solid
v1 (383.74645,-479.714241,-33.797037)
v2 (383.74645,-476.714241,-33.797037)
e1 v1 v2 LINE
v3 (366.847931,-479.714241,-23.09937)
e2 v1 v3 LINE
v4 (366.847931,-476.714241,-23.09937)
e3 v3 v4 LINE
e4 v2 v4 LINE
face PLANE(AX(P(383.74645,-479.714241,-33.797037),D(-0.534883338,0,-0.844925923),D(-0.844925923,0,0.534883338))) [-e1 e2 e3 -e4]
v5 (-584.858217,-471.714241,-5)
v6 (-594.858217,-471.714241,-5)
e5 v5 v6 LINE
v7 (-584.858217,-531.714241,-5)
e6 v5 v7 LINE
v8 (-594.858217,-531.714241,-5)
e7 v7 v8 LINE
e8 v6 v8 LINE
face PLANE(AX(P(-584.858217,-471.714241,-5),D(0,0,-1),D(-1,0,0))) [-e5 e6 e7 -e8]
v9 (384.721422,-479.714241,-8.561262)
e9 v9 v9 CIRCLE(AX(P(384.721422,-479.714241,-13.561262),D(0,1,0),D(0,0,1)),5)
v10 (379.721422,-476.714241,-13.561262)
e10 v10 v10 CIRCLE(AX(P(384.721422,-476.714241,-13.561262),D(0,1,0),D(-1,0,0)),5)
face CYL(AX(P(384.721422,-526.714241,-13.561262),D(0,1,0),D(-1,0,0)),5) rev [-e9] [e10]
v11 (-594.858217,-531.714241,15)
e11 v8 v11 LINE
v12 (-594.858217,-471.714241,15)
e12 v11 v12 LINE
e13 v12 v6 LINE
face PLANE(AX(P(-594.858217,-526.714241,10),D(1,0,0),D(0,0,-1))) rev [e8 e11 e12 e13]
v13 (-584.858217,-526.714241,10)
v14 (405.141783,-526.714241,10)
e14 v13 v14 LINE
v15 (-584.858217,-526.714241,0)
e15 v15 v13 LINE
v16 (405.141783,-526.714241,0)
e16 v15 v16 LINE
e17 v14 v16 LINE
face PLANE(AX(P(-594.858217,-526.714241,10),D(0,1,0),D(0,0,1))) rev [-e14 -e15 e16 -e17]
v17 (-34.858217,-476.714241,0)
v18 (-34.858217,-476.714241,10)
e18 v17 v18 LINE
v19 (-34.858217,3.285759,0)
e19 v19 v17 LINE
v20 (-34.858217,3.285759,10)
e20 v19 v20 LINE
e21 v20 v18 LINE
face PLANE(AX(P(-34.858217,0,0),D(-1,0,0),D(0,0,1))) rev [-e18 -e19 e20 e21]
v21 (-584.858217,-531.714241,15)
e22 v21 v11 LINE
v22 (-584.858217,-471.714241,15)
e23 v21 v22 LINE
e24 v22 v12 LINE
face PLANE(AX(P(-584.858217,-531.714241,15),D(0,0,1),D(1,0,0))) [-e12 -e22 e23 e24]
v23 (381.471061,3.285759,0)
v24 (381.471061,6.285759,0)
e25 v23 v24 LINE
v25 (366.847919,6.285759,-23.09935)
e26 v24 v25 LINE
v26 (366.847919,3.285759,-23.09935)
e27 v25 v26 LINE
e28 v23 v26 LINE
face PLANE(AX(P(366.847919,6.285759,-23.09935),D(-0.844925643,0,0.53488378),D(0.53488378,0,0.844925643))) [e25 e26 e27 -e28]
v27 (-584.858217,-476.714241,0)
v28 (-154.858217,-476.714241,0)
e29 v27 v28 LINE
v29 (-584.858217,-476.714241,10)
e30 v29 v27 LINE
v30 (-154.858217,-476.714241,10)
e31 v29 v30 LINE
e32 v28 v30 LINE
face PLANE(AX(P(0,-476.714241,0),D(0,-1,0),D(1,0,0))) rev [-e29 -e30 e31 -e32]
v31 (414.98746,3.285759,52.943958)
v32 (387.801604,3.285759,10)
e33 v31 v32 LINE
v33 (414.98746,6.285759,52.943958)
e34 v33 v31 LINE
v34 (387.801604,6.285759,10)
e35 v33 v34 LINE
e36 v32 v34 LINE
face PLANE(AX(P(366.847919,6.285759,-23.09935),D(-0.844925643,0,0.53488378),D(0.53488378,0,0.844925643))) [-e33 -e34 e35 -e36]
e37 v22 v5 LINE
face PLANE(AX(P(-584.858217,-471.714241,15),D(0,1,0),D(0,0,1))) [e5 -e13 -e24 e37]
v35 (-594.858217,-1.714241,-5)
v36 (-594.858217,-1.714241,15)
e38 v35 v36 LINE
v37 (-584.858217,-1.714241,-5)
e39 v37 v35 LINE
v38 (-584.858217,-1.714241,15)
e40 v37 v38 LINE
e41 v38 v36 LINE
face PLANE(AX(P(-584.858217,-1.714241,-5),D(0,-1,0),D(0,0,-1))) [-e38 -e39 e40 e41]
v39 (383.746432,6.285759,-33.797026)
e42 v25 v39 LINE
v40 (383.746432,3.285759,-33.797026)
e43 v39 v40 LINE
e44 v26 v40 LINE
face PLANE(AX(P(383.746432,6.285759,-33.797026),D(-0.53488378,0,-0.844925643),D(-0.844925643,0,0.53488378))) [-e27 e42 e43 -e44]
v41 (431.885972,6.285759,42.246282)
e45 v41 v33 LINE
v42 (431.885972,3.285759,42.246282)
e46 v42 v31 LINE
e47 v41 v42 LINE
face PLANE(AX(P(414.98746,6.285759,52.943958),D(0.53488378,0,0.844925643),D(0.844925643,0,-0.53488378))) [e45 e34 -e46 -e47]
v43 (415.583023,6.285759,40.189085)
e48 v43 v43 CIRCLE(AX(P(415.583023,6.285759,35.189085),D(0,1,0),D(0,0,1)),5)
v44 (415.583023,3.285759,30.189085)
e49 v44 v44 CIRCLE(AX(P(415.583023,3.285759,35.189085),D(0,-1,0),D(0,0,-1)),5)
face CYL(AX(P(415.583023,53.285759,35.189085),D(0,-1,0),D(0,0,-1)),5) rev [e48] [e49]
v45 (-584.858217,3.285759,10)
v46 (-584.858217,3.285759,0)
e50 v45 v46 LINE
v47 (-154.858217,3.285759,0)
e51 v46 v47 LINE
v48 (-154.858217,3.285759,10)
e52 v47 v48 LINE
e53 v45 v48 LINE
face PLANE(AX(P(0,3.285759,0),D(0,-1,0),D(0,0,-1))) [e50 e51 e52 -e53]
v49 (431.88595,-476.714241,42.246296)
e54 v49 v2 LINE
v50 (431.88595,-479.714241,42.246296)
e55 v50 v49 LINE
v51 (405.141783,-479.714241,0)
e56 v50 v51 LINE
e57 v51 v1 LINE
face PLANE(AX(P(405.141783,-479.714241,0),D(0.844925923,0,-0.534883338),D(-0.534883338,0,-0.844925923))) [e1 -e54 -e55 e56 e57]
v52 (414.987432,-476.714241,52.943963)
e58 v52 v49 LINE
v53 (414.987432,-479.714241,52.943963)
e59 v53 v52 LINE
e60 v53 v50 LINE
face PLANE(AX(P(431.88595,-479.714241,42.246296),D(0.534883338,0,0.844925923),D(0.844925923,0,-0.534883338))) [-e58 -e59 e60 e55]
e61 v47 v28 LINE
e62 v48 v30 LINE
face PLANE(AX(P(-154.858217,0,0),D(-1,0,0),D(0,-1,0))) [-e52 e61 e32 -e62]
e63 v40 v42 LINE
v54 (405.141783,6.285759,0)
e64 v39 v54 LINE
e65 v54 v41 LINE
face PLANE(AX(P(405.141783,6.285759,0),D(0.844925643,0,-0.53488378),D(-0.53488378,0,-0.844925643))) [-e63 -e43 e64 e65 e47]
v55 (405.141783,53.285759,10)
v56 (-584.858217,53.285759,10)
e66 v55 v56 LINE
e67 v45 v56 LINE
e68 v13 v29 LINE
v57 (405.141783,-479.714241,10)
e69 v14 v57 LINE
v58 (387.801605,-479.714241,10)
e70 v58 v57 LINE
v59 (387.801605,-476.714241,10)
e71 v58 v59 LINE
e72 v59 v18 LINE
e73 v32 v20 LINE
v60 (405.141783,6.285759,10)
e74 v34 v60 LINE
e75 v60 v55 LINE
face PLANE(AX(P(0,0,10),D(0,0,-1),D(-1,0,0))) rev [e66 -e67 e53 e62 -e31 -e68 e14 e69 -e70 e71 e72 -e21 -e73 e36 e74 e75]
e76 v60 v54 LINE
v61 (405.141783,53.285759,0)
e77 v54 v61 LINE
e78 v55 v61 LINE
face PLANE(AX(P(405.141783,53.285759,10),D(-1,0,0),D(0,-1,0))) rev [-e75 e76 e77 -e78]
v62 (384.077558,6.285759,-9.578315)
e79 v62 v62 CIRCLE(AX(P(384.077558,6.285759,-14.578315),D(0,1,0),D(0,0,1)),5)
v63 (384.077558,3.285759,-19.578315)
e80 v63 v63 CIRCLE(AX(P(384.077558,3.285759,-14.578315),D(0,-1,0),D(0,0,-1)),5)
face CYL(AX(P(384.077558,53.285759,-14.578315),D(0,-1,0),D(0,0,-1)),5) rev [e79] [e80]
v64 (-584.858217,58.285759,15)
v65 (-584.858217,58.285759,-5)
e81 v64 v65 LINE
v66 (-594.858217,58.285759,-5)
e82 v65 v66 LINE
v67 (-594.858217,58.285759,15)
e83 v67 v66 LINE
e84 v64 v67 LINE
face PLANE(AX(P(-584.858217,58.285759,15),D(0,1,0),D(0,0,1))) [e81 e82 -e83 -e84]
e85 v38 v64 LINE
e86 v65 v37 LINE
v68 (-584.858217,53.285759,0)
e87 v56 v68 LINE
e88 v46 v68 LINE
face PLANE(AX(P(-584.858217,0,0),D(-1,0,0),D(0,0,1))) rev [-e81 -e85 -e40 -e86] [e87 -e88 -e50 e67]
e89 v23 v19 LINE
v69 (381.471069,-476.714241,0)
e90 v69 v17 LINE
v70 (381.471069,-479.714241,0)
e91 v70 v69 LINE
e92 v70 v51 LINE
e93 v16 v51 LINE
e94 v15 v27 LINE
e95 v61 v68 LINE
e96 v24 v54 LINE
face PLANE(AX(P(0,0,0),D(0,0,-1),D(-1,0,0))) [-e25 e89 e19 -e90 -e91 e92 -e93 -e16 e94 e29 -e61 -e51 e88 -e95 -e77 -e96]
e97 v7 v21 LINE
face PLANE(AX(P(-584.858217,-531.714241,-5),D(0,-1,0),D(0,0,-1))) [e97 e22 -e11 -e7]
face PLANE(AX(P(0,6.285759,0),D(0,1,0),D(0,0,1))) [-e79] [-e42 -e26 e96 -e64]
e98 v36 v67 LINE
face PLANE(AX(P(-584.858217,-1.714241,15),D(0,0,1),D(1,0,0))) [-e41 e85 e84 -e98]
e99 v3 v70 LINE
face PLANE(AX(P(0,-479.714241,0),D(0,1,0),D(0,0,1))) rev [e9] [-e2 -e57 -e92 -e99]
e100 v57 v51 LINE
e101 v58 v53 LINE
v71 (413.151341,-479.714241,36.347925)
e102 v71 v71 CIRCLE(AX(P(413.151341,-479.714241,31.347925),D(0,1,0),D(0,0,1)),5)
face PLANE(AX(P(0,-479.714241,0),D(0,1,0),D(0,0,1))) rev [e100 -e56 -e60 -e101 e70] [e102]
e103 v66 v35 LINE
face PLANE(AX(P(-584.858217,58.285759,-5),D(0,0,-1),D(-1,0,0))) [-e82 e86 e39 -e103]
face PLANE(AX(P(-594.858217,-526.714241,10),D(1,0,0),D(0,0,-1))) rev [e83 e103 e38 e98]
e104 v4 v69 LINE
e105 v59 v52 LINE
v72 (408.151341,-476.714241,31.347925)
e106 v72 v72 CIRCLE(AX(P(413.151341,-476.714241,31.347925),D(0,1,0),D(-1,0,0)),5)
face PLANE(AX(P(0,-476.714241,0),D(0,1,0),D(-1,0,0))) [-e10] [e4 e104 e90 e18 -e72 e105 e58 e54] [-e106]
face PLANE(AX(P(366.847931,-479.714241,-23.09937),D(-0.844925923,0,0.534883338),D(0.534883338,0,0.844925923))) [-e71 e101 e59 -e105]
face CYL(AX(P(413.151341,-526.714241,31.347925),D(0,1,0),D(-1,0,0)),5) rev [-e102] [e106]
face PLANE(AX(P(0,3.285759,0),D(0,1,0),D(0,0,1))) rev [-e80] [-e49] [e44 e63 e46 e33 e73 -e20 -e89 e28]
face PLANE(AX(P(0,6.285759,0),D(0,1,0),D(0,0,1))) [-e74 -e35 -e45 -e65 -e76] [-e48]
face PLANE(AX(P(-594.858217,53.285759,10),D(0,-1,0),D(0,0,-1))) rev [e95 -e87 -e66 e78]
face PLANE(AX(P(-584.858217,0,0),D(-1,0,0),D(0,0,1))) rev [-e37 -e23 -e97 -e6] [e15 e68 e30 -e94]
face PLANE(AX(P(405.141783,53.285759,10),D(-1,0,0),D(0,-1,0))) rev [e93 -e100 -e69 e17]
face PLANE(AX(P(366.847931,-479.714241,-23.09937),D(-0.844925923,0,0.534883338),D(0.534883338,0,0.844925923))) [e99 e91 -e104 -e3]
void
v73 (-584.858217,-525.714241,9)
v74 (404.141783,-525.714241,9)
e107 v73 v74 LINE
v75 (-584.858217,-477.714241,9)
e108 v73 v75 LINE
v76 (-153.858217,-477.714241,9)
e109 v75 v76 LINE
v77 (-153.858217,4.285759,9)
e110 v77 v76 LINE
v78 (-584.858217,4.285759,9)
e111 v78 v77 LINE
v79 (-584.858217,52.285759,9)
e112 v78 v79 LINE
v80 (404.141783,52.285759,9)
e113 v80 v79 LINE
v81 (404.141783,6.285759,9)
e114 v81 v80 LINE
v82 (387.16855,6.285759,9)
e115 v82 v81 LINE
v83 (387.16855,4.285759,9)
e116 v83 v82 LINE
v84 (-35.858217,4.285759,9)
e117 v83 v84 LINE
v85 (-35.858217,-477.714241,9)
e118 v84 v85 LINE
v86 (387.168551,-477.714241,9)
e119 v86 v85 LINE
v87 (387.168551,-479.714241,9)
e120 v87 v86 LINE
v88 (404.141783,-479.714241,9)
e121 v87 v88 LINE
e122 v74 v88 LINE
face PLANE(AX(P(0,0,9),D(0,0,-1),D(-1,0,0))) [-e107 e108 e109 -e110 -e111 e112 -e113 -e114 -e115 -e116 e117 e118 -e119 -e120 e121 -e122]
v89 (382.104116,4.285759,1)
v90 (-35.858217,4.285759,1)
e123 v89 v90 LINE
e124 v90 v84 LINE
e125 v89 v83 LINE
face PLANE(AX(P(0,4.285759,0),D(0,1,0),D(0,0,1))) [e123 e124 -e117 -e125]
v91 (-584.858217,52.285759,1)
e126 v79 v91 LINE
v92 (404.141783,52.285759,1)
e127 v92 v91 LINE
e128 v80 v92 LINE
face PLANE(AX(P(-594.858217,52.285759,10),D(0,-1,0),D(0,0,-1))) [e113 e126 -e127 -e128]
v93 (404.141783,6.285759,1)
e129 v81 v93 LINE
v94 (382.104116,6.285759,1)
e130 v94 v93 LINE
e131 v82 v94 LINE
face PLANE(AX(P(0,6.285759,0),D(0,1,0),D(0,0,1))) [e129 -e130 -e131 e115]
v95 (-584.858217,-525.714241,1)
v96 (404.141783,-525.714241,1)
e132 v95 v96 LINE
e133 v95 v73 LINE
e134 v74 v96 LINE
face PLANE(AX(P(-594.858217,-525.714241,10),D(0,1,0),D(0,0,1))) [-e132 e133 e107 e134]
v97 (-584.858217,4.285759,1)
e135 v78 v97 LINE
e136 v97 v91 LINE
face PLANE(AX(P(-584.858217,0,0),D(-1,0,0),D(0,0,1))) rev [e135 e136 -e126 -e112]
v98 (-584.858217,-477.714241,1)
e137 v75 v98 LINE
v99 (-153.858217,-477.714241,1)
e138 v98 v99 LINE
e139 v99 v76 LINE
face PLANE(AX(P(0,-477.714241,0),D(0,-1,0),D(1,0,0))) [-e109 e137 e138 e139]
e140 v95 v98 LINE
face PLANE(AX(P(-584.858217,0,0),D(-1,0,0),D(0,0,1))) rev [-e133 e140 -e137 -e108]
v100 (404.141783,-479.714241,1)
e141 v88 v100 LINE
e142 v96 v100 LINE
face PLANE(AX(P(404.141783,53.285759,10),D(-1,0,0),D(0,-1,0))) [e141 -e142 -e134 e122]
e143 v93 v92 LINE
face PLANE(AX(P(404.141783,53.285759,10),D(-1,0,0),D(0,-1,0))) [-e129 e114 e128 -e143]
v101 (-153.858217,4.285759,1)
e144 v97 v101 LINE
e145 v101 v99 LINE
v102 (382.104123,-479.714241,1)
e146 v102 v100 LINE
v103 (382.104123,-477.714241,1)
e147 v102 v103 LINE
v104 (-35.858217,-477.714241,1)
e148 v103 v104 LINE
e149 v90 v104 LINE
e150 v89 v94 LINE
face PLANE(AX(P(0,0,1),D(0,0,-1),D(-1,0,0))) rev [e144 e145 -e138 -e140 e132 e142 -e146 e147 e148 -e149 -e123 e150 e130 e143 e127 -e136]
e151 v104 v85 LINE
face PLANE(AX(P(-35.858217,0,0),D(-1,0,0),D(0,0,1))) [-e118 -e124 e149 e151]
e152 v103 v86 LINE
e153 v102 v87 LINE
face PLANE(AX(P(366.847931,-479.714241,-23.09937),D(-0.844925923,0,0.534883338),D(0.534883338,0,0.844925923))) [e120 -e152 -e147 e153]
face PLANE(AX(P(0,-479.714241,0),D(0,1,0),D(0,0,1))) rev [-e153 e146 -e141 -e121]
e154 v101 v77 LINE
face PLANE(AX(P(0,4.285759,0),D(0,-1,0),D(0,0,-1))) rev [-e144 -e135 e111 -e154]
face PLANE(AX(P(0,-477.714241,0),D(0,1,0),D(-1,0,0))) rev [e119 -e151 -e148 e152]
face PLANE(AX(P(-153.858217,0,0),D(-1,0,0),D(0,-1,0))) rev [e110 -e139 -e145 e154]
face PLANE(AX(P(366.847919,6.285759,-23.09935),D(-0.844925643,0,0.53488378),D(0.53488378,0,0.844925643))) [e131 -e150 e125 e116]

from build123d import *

# Parameters (mm, degrees)
SKETCH1_W           = 1000
SKETCH1_H           = 580
BOSS_EXTRUDE1_DEPTH = 10
SKETCH2_W           = 440
SKETCH2_H           = 480
CUT_EXTRUDE3_DEPTH  = 795.596872652
SHELL2_START        = -593.858216583
SHELL2_OUTLINE_W    = 48
SHELL2_OUTLINE_H    = 8
SHELL2_DEPTH        = 998
SHELL2_START_2      = -153.858216583
SHELL2_2_OUTLINE_W  = 482
SHELL2_2_OUTLINE_H  = 8
SHELL2_2_DEPTH      = 118
BOSS_EXTRUDE2_DEPTH = 3
BOSS_EXTRUDE4_DEPTH = 3
SKETCH11_R          = 5
CUT_EXTRUDE6_DEPTH  = 799.473143596
SKETCH13_R          = 5
CUT_EXTRUDE7_DEPTH  = 799.473143596
SKETCH14_W          = 20
SKETCH14_H          = 60
BOSS_EXTRUDE5_DEPTH = 10
SKETCH15_W          = 20
SKETCH15_H          = 60
BOSS_EXTRUDE6_DEPTH = 10


# Read off the part's stored shape, not the designer's step: Shell2
with BuildPart() as part:
    # Sketch1 → Boss-Extrude1 (new body)
    with BuildSketch(Plane.XY):
        with Locations((-94.858216583, -236.714241493)):
            Rectangle(SKETCH1_W, SKETCH1_H)
    extrude(amount=BOSS_EXTRUDE1_DEPTH)

    # Sketch2 → Cut-Extrude3 (cut, through all)
    with BuildSketch(Plane.XY.offset(10)):
        with Locations((185.141783417, -236.714241493)):
            Rectangle(SKETCH2_W, SKETCH2_H)
        with Locations((-374.858216583, -236.714241493)):
            Rectangle(SKETCH2_W, SKETCH2_H)
    extrude(amount=-CUT_EXTRUDE3_DEPTH, mode=Mode.SUBTRACT)

    # Shell2 outline → Shell2 (cut)
    with BuildSketch(Plane.YZ.offset(SHELL2_START)):
        with Locations((-501.714241493, 5)):
            Rectangle(SHELL2_OUTLINE_W, SHELL2_OUTLINE_H)
        with Locations((28.285758507, 5)):
            Rectangle(SHELL2_OUTLINE_W, SHELL2_OUTLINE_H)
    extrude(amount=SHELL2_DEPTH, mode=Mode.SUBTRACT)

    # Shell2 2 outline → Shell2 2 (cut)
    with BuildSketch(Plane.YZ.offset(SHELL2_START_2)):
        with Locations((-236.714241493, 5)):
            Rectangle(SHELL2_2_OUTLINE_W, SHELL2_2_OUTLINE_H)
    extrude(amount=SHELL2_2_DEPTH, mode=Mode.SUBTRACT)

    # Sketch5 → Boss-Extrude2 (add)
    with BuildSketch(Plane(origin=(0, -476.714241493, 0), x_dir=(1, 0, 0), z_dir=(0, 1, 0))):
        Polygon((405.141783417, 0), (431.885950294, -42.246296146), (414.987431836, -52.943962897), (366.847931456, 23.099370165), (383.746449915, 33.797036917), align=None)
    extrude(amount=-BOSS_EXTRUDE2_DEPTH)

    # Sketch10 → Boss-Extrude4 (add)
    with BuildSketch(Plane.XZ.offset(-3.285758507)):
        Polygon((405.141783417, 0), (431.885972414, 42.246282142), (414.987459557, 52.943957741), (366.847919362, -23.099350115), (383.746432219, -33.797025714), align=None)
    extrude(amount=-BOSS_EXTRUDE4_DEPTH)

    # Sketch11 → Cut-Extrude6 (cut, through all)
    with BuildSketch(Plane.XZ.offset(-3.285758507)):
        with Locations(Location((415.58302294, 35.189085408, 0), (0, 0, 270))):
            Circle(SKETCH11_R)
        with Locations(Location((384.0775579, -14.578315099, 0), (0, 0, 270))):
            Circle(SKETCH11_R)
    extrude(amount=-CUT_EXTRUDE6_DEPTH, mode=Mode.SUBTRACT)

    # Sketch13 → Cut-Extrude7 (cut, through all)
    with BuildSketch(Plane(origin=(0, -476.714241493, 0), x_dir=(1, 0, 0), z_dir=(0, 1, 0))):
        with Locations(Location((413.151340982, -31.347925129, 0), (0, 0, 180))):
            Circle(SKETCH13_R)
        with Locations(Location((384.72142187, 13.561261525, 0), (0, 0, 180))):
            Circle(SKETCH13_R)
    extrude(amount=-CUT_EXTRUDE7_DEPTH, mode=Mode.SUBTRACT)

    # Sketch14 → Boss-Extrude5 (add)
    with BuildSketch(Plane.ZY.offset(594.858216583)):
        with Locations((5, 28.285758507)):
            Rectangle(SKETCH14_W, SKETCH14_H)
    extrude(amount=-BOSS_EXTRUDE5_DEPTH)

    # Sketch15 → Boss-Extrude6 (add)
    with BuildSketch(Plane.ZY.offset(594.858216583)):
        with Locations((5, -501.714241493)):
            Rectangle(SKETCH15_W, SKETCH15_H)
    extrude(amount=-BOSS_EXTRUDE6_DEPTH)


solid = part.part
